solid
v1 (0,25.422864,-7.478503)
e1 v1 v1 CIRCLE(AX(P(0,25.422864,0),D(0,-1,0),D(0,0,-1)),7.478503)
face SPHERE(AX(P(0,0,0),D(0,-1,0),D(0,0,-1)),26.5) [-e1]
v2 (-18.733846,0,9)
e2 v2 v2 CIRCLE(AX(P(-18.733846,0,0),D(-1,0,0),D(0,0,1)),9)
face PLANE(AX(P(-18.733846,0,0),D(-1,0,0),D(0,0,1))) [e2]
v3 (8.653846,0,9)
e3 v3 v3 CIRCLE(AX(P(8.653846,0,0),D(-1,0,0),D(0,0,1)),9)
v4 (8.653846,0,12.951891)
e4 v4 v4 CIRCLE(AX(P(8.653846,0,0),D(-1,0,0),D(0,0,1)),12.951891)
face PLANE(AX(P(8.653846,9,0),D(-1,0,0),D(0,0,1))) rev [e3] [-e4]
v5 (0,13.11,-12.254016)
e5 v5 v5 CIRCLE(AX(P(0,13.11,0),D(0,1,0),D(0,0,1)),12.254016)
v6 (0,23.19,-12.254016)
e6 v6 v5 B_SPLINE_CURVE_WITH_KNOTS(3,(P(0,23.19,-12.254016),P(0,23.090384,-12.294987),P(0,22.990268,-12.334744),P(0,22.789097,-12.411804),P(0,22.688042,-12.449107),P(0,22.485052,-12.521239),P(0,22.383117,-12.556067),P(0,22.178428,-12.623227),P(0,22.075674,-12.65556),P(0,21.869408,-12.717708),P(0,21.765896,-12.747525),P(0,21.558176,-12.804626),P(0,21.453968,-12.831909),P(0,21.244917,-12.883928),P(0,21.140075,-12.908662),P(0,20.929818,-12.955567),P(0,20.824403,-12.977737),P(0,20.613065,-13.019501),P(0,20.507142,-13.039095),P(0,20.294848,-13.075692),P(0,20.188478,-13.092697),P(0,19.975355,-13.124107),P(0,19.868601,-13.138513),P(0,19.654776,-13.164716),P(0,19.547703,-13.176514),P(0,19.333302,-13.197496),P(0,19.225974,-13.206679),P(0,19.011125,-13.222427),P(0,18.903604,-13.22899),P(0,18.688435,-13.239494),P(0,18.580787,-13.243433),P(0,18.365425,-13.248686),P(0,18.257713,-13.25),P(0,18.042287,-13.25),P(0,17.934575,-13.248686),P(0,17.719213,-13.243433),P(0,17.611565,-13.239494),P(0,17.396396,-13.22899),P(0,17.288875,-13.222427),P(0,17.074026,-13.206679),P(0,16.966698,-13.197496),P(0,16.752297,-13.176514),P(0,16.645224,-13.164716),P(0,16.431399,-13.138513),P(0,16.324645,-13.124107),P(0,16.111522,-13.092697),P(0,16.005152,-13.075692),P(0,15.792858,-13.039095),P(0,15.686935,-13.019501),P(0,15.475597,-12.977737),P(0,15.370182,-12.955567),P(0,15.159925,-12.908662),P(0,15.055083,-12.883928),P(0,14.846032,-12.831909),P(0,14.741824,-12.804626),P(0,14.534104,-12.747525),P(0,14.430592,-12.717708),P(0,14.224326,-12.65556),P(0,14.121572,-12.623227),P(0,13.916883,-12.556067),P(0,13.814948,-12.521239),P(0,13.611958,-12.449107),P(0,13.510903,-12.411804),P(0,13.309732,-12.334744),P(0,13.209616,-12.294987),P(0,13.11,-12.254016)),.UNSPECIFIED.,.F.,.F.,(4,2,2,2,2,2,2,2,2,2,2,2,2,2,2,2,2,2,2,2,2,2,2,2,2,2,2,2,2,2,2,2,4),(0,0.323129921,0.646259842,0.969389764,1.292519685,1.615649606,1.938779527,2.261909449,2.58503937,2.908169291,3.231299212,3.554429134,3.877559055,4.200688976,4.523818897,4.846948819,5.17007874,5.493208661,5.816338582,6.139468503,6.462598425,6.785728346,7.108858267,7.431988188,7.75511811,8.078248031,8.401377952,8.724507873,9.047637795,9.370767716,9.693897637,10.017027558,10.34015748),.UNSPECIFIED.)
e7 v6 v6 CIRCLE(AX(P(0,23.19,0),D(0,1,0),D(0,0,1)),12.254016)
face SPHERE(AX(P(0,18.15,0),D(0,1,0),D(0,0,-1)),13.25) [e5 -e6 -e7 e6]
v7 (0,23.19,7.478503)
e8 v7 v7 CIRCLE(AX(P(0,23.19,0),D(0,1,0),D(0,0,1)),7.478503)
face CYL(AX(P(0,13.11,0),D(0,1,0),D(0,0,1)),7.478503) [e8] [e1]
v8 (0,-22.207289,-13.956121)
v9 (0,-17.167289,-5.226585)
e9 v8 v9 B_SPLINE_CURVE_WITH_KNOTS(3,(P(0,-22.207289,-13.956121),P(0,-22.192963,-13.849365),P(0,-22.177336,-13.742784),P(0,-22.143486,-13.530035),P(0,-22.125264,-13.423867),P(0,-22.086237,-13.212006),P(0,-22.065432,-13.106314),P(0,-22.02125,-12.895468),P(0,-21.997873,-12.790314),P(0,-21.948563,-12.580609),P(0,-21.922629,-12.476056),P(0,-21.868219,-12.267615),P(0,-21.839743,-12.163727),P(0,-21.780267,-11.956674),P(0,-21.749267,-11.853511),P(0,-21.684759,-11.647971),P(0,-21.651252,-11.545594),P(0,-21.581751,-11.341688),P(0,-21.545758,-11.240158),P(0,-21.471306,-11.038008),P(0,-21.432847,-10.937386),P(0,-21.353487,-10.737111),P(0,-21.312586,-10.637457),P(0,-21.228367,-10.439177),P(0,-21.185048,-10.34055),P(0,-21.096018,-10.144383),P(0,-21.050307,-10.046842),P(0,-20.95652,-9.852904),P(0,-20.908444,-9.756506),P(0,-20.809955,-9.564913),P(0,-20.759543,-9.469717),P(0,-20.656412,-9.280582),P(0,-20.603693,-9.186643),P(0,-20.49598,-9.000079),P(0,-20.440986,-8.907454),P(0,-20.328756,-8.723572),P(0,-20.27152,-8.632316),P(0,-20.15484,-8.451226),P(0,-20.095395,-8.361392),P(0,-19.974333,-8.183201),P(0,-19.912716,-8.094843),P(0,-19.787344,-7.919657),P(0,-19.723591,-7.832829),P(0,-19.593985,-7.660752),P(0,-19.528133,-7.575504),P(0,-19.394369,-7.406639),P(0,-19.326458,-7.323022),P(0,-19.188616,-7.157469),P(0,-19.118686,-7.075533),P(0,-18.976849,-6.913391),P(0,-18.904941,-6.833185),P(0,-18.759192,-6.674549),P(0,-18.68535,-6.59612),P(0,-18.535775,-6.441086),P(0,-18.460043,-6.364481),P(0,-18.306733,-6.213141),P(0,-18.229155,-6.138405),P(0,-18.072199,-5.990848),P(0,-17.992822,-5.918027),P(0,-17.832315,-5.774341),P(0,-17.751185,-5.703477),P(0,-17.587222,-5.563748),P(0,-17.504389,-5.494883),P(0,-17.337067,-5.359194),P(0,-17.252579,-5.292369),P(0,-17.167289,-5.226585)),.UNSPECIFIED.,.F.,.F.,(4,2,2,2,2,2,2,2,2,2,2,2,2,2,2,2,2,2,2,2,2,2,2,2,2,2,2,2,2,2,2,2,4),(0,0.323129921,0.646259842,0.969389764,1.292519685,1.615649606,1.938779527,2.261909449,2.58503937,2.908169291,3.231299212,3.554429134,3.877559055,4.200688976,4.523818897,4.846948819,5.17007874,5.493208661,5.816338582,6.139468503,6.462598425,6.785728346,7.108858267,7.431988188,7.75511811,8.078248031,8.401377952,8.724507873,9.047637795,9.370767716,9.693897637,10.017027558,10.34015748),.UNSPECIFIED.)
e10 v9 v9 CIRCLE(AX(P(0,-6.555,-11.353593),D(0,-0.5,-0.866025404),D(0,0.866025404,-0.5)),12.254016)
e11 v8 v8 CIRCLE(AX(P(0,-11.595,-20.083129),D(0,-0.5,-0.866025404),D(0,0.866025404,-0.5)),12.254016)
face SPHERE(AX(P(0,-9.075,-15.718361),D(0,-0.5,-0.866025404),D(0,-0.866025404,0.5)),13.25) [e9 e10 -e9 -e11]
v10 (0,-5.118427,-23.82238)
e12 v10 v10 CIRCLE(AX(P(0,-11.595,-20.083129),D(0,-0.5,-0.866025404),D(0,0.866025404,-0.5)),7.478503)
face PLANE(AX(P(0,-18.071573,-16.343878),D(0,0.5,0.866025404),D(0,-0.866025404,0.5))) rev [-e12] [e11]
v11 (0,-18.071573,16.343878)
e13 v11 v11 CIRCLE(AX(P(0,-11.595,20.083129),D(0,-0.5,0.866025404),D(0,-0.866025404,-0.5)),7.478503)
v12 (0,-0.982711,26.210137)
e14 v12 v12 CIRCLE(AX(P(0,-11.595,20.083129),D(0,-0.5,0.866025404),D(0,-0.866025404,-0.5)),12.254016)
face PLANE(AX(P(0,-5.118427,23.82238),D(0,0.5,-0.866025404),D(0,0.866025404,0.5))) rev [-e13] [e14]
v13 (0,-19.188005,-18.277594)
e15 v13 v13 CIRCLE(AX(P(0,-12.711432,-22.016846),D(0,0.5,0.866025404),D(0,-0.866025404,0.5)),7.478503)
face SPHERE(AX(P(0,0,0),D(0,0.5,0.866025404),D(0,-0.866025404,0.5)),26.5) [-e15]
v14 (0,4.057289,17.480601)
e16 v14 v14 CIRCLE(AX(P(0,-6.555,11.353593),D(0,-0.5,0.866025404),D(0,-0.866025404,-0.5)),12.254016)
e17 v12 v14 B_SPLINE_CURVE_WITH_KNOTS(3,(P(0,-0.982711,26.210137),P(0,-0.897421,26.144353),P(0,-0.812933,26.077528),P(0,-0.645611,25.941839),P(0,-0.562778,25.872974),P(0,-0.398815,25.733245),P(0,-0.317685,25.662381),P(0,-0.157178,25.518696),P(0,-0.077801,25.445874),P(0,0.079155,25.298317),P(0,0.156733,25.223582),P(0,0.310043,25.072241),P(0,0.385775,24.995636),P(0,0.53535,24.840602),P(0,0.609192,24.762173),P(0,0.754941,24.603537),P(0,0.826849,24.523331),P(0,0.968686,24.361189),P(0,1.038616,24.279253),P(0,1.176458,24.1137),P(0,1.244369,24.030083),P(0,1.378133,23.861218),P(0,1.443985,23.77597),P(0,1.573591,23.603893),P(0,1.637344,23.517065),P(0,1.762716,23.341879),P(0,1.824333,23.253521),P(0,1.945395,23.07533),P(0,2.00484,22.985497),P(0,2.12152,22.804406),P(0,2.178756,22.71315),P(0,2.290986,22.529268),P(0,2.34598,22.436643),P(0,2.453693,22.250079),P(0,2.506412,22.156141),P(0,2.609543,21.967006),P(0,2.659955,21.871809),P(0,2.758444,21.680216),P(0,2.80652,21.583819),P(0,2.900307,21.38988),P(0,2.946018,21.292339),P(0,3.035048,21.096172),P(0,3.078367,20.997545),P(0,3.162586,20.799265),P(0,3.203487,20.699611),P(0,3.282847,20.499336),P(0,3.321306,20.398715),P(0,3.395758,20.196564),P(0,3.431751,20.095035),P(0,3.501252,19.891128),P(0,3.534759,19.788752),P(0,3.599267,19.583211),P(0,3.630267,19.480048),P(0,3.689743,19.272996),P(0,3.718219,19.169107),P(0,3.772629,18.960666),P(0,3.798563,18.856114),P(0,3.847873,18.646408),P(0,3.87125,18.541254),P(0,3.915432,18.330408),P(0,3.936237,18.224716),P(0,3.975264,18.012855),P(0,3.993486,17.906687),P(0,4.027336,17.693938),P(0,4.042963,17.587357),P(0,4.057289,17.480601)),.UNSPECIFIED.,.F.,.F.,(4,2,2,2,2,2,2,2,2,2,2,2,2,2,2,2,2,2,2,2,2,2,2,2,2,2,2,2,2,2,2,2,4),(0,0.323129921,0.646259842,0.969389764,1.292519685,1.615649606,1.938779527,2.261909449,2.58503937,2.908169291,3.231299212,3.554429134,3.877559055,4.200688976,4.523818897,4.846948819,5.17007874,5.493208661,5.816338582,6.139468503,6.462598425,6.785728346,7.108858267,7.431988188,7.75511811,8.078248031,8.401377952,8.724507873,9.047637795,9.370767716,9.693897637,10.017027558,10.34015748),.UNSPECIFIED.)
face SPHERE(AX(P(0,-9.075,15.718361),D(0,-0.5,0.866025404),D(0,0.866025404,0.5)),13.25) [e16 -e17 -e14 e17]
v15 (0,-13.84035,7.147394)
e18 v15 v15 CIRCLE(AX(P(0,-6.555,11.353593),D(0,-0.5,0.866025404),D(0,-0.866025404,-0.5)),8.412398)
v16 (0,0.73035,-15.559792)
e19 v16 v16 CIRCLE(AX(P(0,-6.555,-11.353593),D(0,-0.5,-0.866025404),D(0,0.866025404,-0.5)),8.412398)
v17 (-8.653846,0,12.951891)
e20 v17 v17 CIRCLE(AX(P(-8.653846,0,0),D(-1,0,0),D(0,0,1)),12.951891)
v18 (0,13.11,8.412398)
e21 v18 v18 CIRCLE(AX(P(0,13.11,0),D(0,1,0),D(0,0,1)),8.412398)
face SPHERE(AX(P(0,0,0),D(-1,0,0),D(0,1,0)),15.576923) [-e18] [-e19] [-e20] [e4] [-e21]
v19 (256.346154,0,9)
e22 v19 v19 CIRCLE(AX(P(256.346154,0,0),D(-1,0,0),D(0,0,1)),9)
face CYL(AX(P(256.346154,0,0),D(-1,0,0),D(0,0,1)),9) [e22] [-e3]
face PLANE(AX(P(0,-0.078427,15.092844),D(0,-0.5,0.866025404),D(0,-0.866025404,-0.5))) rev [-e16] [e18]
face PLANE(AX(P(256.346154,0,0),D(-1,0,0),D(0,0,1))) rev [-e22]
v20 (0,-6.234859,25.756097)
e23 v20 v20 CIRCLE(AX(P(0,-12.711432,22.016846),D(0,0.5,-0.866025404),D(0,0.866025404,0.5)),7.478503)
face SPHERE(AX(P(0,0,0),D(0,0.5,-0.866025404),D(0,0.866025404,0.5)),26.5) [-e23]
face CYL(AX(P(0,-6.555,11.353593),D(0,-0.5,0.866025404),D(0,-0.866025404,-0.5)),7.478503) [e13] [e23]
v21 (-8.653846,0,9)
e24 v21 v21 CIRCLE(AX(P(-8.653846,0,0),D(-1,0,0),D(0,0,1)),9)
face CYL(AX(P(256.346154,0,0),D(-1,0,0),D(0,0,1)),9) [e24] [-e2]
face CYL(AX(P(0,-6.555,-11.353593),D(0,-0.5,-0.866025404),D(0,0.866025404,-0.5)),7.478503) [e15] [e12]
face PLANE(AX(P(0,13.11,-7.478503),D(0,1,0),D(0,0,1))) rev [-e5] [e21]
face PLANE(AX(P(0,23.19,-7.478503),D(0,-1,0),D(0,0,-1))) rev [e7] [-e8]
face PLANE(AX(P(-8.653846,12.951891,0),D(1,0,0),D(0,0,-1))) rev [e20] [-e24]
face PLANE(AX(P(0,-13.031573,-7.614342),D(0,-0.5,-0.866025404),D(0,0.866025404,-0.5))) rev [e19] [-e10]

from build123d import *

# Parameters (mm, degrees)
CUT_EXTRUDE1_DEPTH       = 29.014947405
BOSS_EXTRUDE1_START      = 13.11
BOSS_EXTRUDE1_OUTLINE_R  = 7.478502705
BOSS_EXTRUDE1_DEPTH      = 10.08
CIRPATTERN1_COUNT        = 3
BOSS_EXTRUDE2_DEPTH      = 10.08
BOSS_EXTRUDE2_DEPTH_BACK = 265
SKETCH6_R                = 9


# Read off the part's stored shape, not the designer's step: Boss-Extrude1, Revolve3
with BuildPart() as part:
    # Sketch1 → Revolve1 (revolve)
    with BuildSketch(Plane.XY):
        with BuildLine():
            Line((-8.653846154, 12.951890954), (-8.653846154, 9))
            Line((-8.653846154, 9), (8.653846154, 9))
            Line((8.653846154, 9), (8.653846154, 12.951890954))
            ThreePointArc((8.653846154, 12.951890954), (0, 15.576923077), (-8.653846154, 12.951890954))
        make_face()
    revolve(axis=Axis((-47.061566383, 0, 0), (1, 0, 0)))

    # Sketch2 → Cut-Extrude1 (cut, symmetric)
    with BuildSketch(Plane(origin=(8.653846154, 0, 0), x_dir=(0, 0, -1), z_dir=(1, 0, 0))):
        Polygon((-17.183661108, 13.11), (20.1337897, 13.11), (18.772985043, 23.764289573), (-17.183661108, 23.764289573), align=None)
    cut_extrude1 = extrude(amount=CUT_EXTRUDE1_DEPTH, both=True, mode=Mode.SUBTRACT)

    # Boss-Extrude1 outline → Boss-Extrude1 (add)
    with BuildSketch(Plane(origin=(0, 0, 0), x_dir=(1, 0, 0), z_dir=(0, 1, 0)).offset(BOSS_EXTRUDE1_START)):
        Circle(BOSS_EXTRUDE1_OUTLINE_R)
    boss_extrude1 = extrude(amount=BOSS_EXTRUDE1_DEPTH)

    # Sketch4 → Revolve2 (revolve)
    with BuildSketch(Plane(origin=(0, 0, 0), x_dir=(0, 0, -1), z_dir=(1, 0, 0)), mode=Mode.PRIVATE) as revolve2_sk:
        with BuildLine():
            Line((7.478502705, 25.422863672), (7.478502705, 23.19))
            Line((7.478502705, 23.19), (0, 23.19))
            Line((0, 23.19), (0, 26.5))
            ThreePointArc((0, 26.5), (3.777837522, 26.229333649), (7.478502705, 25.422863672))
        make_face()
    revolve2 = revolve(revolve2_sk.sketch.rotate(Axis((0, 0, 0), (0, 1, 0)), 180), axis=Axis((0, 0, 0), (0, 1, 0)))

    # Revolve3 outline → Revolve3 (revolve)
    with BuildSketch(Plane.XY):
        with BuildLine():
            Line((7.478502705, 13.109999994), (12.254015665, 13.109999994))
            ThreePointArc((12.254015665, 13.109999994), (13.25, 18.15), (12.254015665, 23.190000006))
            Line((12.254015665, 23.190000006), (7.478502705, 23.19))
            Line((7.478502705, 23.19), (7.478502705, 13.109999994))
        make_face()
    revolve3 = revolve(axis=Axis((0, 0, 0), (0, 1, 0)))

    # CirPattern1: Cut-Extrude1, Boss-Extrude1, Revolve2, Revolve3 ×3 about axis
    cirpattern1_axis = Axis((0, 0, 0), (1, 0, 0))
    add([cut_extrude1.rotate(cirpattern1_axis, i * 360 / CIRPATTERN1_COUNT) for i in range(1, CIRPATTERN1_COUNT)], mode=Mode.SUBTRACT)
    add([boss_extrude1.rotate(cirpattern1_axis, i * 360 / CIRPATTERN1_COUNT) for i in range(1, CIRPATTERN1_COUNT)])
    add([revolve2.rotate(cirpattern1_axis, i * 360 / CIRPATTERN1_COUNT) for i in range(1, CIRPATTERN1_COUNT)])
    add([revolve3.rotate(cirpattern1_axis, i * 360 / CIRPATTERN1_COUNT) for i in range(1, CIRPATTERN1_COUNT)])

    # Sketch6 → Boss-Extrude2 (add, two sides: drawn at the far end of the back side and taken through both)
    with BuildSketch(Plane.ZY.offset(8.653846154).offset(-BOSS_EXTRUDE2_DEPTH_BACK)):
        Circle(SKETCH6_R)
    extrude(amount=BOSS_EXTRUDE2_DEPTH + BOSS_EXTRUDE2_DEPTH_BACK)


solid = part.part
